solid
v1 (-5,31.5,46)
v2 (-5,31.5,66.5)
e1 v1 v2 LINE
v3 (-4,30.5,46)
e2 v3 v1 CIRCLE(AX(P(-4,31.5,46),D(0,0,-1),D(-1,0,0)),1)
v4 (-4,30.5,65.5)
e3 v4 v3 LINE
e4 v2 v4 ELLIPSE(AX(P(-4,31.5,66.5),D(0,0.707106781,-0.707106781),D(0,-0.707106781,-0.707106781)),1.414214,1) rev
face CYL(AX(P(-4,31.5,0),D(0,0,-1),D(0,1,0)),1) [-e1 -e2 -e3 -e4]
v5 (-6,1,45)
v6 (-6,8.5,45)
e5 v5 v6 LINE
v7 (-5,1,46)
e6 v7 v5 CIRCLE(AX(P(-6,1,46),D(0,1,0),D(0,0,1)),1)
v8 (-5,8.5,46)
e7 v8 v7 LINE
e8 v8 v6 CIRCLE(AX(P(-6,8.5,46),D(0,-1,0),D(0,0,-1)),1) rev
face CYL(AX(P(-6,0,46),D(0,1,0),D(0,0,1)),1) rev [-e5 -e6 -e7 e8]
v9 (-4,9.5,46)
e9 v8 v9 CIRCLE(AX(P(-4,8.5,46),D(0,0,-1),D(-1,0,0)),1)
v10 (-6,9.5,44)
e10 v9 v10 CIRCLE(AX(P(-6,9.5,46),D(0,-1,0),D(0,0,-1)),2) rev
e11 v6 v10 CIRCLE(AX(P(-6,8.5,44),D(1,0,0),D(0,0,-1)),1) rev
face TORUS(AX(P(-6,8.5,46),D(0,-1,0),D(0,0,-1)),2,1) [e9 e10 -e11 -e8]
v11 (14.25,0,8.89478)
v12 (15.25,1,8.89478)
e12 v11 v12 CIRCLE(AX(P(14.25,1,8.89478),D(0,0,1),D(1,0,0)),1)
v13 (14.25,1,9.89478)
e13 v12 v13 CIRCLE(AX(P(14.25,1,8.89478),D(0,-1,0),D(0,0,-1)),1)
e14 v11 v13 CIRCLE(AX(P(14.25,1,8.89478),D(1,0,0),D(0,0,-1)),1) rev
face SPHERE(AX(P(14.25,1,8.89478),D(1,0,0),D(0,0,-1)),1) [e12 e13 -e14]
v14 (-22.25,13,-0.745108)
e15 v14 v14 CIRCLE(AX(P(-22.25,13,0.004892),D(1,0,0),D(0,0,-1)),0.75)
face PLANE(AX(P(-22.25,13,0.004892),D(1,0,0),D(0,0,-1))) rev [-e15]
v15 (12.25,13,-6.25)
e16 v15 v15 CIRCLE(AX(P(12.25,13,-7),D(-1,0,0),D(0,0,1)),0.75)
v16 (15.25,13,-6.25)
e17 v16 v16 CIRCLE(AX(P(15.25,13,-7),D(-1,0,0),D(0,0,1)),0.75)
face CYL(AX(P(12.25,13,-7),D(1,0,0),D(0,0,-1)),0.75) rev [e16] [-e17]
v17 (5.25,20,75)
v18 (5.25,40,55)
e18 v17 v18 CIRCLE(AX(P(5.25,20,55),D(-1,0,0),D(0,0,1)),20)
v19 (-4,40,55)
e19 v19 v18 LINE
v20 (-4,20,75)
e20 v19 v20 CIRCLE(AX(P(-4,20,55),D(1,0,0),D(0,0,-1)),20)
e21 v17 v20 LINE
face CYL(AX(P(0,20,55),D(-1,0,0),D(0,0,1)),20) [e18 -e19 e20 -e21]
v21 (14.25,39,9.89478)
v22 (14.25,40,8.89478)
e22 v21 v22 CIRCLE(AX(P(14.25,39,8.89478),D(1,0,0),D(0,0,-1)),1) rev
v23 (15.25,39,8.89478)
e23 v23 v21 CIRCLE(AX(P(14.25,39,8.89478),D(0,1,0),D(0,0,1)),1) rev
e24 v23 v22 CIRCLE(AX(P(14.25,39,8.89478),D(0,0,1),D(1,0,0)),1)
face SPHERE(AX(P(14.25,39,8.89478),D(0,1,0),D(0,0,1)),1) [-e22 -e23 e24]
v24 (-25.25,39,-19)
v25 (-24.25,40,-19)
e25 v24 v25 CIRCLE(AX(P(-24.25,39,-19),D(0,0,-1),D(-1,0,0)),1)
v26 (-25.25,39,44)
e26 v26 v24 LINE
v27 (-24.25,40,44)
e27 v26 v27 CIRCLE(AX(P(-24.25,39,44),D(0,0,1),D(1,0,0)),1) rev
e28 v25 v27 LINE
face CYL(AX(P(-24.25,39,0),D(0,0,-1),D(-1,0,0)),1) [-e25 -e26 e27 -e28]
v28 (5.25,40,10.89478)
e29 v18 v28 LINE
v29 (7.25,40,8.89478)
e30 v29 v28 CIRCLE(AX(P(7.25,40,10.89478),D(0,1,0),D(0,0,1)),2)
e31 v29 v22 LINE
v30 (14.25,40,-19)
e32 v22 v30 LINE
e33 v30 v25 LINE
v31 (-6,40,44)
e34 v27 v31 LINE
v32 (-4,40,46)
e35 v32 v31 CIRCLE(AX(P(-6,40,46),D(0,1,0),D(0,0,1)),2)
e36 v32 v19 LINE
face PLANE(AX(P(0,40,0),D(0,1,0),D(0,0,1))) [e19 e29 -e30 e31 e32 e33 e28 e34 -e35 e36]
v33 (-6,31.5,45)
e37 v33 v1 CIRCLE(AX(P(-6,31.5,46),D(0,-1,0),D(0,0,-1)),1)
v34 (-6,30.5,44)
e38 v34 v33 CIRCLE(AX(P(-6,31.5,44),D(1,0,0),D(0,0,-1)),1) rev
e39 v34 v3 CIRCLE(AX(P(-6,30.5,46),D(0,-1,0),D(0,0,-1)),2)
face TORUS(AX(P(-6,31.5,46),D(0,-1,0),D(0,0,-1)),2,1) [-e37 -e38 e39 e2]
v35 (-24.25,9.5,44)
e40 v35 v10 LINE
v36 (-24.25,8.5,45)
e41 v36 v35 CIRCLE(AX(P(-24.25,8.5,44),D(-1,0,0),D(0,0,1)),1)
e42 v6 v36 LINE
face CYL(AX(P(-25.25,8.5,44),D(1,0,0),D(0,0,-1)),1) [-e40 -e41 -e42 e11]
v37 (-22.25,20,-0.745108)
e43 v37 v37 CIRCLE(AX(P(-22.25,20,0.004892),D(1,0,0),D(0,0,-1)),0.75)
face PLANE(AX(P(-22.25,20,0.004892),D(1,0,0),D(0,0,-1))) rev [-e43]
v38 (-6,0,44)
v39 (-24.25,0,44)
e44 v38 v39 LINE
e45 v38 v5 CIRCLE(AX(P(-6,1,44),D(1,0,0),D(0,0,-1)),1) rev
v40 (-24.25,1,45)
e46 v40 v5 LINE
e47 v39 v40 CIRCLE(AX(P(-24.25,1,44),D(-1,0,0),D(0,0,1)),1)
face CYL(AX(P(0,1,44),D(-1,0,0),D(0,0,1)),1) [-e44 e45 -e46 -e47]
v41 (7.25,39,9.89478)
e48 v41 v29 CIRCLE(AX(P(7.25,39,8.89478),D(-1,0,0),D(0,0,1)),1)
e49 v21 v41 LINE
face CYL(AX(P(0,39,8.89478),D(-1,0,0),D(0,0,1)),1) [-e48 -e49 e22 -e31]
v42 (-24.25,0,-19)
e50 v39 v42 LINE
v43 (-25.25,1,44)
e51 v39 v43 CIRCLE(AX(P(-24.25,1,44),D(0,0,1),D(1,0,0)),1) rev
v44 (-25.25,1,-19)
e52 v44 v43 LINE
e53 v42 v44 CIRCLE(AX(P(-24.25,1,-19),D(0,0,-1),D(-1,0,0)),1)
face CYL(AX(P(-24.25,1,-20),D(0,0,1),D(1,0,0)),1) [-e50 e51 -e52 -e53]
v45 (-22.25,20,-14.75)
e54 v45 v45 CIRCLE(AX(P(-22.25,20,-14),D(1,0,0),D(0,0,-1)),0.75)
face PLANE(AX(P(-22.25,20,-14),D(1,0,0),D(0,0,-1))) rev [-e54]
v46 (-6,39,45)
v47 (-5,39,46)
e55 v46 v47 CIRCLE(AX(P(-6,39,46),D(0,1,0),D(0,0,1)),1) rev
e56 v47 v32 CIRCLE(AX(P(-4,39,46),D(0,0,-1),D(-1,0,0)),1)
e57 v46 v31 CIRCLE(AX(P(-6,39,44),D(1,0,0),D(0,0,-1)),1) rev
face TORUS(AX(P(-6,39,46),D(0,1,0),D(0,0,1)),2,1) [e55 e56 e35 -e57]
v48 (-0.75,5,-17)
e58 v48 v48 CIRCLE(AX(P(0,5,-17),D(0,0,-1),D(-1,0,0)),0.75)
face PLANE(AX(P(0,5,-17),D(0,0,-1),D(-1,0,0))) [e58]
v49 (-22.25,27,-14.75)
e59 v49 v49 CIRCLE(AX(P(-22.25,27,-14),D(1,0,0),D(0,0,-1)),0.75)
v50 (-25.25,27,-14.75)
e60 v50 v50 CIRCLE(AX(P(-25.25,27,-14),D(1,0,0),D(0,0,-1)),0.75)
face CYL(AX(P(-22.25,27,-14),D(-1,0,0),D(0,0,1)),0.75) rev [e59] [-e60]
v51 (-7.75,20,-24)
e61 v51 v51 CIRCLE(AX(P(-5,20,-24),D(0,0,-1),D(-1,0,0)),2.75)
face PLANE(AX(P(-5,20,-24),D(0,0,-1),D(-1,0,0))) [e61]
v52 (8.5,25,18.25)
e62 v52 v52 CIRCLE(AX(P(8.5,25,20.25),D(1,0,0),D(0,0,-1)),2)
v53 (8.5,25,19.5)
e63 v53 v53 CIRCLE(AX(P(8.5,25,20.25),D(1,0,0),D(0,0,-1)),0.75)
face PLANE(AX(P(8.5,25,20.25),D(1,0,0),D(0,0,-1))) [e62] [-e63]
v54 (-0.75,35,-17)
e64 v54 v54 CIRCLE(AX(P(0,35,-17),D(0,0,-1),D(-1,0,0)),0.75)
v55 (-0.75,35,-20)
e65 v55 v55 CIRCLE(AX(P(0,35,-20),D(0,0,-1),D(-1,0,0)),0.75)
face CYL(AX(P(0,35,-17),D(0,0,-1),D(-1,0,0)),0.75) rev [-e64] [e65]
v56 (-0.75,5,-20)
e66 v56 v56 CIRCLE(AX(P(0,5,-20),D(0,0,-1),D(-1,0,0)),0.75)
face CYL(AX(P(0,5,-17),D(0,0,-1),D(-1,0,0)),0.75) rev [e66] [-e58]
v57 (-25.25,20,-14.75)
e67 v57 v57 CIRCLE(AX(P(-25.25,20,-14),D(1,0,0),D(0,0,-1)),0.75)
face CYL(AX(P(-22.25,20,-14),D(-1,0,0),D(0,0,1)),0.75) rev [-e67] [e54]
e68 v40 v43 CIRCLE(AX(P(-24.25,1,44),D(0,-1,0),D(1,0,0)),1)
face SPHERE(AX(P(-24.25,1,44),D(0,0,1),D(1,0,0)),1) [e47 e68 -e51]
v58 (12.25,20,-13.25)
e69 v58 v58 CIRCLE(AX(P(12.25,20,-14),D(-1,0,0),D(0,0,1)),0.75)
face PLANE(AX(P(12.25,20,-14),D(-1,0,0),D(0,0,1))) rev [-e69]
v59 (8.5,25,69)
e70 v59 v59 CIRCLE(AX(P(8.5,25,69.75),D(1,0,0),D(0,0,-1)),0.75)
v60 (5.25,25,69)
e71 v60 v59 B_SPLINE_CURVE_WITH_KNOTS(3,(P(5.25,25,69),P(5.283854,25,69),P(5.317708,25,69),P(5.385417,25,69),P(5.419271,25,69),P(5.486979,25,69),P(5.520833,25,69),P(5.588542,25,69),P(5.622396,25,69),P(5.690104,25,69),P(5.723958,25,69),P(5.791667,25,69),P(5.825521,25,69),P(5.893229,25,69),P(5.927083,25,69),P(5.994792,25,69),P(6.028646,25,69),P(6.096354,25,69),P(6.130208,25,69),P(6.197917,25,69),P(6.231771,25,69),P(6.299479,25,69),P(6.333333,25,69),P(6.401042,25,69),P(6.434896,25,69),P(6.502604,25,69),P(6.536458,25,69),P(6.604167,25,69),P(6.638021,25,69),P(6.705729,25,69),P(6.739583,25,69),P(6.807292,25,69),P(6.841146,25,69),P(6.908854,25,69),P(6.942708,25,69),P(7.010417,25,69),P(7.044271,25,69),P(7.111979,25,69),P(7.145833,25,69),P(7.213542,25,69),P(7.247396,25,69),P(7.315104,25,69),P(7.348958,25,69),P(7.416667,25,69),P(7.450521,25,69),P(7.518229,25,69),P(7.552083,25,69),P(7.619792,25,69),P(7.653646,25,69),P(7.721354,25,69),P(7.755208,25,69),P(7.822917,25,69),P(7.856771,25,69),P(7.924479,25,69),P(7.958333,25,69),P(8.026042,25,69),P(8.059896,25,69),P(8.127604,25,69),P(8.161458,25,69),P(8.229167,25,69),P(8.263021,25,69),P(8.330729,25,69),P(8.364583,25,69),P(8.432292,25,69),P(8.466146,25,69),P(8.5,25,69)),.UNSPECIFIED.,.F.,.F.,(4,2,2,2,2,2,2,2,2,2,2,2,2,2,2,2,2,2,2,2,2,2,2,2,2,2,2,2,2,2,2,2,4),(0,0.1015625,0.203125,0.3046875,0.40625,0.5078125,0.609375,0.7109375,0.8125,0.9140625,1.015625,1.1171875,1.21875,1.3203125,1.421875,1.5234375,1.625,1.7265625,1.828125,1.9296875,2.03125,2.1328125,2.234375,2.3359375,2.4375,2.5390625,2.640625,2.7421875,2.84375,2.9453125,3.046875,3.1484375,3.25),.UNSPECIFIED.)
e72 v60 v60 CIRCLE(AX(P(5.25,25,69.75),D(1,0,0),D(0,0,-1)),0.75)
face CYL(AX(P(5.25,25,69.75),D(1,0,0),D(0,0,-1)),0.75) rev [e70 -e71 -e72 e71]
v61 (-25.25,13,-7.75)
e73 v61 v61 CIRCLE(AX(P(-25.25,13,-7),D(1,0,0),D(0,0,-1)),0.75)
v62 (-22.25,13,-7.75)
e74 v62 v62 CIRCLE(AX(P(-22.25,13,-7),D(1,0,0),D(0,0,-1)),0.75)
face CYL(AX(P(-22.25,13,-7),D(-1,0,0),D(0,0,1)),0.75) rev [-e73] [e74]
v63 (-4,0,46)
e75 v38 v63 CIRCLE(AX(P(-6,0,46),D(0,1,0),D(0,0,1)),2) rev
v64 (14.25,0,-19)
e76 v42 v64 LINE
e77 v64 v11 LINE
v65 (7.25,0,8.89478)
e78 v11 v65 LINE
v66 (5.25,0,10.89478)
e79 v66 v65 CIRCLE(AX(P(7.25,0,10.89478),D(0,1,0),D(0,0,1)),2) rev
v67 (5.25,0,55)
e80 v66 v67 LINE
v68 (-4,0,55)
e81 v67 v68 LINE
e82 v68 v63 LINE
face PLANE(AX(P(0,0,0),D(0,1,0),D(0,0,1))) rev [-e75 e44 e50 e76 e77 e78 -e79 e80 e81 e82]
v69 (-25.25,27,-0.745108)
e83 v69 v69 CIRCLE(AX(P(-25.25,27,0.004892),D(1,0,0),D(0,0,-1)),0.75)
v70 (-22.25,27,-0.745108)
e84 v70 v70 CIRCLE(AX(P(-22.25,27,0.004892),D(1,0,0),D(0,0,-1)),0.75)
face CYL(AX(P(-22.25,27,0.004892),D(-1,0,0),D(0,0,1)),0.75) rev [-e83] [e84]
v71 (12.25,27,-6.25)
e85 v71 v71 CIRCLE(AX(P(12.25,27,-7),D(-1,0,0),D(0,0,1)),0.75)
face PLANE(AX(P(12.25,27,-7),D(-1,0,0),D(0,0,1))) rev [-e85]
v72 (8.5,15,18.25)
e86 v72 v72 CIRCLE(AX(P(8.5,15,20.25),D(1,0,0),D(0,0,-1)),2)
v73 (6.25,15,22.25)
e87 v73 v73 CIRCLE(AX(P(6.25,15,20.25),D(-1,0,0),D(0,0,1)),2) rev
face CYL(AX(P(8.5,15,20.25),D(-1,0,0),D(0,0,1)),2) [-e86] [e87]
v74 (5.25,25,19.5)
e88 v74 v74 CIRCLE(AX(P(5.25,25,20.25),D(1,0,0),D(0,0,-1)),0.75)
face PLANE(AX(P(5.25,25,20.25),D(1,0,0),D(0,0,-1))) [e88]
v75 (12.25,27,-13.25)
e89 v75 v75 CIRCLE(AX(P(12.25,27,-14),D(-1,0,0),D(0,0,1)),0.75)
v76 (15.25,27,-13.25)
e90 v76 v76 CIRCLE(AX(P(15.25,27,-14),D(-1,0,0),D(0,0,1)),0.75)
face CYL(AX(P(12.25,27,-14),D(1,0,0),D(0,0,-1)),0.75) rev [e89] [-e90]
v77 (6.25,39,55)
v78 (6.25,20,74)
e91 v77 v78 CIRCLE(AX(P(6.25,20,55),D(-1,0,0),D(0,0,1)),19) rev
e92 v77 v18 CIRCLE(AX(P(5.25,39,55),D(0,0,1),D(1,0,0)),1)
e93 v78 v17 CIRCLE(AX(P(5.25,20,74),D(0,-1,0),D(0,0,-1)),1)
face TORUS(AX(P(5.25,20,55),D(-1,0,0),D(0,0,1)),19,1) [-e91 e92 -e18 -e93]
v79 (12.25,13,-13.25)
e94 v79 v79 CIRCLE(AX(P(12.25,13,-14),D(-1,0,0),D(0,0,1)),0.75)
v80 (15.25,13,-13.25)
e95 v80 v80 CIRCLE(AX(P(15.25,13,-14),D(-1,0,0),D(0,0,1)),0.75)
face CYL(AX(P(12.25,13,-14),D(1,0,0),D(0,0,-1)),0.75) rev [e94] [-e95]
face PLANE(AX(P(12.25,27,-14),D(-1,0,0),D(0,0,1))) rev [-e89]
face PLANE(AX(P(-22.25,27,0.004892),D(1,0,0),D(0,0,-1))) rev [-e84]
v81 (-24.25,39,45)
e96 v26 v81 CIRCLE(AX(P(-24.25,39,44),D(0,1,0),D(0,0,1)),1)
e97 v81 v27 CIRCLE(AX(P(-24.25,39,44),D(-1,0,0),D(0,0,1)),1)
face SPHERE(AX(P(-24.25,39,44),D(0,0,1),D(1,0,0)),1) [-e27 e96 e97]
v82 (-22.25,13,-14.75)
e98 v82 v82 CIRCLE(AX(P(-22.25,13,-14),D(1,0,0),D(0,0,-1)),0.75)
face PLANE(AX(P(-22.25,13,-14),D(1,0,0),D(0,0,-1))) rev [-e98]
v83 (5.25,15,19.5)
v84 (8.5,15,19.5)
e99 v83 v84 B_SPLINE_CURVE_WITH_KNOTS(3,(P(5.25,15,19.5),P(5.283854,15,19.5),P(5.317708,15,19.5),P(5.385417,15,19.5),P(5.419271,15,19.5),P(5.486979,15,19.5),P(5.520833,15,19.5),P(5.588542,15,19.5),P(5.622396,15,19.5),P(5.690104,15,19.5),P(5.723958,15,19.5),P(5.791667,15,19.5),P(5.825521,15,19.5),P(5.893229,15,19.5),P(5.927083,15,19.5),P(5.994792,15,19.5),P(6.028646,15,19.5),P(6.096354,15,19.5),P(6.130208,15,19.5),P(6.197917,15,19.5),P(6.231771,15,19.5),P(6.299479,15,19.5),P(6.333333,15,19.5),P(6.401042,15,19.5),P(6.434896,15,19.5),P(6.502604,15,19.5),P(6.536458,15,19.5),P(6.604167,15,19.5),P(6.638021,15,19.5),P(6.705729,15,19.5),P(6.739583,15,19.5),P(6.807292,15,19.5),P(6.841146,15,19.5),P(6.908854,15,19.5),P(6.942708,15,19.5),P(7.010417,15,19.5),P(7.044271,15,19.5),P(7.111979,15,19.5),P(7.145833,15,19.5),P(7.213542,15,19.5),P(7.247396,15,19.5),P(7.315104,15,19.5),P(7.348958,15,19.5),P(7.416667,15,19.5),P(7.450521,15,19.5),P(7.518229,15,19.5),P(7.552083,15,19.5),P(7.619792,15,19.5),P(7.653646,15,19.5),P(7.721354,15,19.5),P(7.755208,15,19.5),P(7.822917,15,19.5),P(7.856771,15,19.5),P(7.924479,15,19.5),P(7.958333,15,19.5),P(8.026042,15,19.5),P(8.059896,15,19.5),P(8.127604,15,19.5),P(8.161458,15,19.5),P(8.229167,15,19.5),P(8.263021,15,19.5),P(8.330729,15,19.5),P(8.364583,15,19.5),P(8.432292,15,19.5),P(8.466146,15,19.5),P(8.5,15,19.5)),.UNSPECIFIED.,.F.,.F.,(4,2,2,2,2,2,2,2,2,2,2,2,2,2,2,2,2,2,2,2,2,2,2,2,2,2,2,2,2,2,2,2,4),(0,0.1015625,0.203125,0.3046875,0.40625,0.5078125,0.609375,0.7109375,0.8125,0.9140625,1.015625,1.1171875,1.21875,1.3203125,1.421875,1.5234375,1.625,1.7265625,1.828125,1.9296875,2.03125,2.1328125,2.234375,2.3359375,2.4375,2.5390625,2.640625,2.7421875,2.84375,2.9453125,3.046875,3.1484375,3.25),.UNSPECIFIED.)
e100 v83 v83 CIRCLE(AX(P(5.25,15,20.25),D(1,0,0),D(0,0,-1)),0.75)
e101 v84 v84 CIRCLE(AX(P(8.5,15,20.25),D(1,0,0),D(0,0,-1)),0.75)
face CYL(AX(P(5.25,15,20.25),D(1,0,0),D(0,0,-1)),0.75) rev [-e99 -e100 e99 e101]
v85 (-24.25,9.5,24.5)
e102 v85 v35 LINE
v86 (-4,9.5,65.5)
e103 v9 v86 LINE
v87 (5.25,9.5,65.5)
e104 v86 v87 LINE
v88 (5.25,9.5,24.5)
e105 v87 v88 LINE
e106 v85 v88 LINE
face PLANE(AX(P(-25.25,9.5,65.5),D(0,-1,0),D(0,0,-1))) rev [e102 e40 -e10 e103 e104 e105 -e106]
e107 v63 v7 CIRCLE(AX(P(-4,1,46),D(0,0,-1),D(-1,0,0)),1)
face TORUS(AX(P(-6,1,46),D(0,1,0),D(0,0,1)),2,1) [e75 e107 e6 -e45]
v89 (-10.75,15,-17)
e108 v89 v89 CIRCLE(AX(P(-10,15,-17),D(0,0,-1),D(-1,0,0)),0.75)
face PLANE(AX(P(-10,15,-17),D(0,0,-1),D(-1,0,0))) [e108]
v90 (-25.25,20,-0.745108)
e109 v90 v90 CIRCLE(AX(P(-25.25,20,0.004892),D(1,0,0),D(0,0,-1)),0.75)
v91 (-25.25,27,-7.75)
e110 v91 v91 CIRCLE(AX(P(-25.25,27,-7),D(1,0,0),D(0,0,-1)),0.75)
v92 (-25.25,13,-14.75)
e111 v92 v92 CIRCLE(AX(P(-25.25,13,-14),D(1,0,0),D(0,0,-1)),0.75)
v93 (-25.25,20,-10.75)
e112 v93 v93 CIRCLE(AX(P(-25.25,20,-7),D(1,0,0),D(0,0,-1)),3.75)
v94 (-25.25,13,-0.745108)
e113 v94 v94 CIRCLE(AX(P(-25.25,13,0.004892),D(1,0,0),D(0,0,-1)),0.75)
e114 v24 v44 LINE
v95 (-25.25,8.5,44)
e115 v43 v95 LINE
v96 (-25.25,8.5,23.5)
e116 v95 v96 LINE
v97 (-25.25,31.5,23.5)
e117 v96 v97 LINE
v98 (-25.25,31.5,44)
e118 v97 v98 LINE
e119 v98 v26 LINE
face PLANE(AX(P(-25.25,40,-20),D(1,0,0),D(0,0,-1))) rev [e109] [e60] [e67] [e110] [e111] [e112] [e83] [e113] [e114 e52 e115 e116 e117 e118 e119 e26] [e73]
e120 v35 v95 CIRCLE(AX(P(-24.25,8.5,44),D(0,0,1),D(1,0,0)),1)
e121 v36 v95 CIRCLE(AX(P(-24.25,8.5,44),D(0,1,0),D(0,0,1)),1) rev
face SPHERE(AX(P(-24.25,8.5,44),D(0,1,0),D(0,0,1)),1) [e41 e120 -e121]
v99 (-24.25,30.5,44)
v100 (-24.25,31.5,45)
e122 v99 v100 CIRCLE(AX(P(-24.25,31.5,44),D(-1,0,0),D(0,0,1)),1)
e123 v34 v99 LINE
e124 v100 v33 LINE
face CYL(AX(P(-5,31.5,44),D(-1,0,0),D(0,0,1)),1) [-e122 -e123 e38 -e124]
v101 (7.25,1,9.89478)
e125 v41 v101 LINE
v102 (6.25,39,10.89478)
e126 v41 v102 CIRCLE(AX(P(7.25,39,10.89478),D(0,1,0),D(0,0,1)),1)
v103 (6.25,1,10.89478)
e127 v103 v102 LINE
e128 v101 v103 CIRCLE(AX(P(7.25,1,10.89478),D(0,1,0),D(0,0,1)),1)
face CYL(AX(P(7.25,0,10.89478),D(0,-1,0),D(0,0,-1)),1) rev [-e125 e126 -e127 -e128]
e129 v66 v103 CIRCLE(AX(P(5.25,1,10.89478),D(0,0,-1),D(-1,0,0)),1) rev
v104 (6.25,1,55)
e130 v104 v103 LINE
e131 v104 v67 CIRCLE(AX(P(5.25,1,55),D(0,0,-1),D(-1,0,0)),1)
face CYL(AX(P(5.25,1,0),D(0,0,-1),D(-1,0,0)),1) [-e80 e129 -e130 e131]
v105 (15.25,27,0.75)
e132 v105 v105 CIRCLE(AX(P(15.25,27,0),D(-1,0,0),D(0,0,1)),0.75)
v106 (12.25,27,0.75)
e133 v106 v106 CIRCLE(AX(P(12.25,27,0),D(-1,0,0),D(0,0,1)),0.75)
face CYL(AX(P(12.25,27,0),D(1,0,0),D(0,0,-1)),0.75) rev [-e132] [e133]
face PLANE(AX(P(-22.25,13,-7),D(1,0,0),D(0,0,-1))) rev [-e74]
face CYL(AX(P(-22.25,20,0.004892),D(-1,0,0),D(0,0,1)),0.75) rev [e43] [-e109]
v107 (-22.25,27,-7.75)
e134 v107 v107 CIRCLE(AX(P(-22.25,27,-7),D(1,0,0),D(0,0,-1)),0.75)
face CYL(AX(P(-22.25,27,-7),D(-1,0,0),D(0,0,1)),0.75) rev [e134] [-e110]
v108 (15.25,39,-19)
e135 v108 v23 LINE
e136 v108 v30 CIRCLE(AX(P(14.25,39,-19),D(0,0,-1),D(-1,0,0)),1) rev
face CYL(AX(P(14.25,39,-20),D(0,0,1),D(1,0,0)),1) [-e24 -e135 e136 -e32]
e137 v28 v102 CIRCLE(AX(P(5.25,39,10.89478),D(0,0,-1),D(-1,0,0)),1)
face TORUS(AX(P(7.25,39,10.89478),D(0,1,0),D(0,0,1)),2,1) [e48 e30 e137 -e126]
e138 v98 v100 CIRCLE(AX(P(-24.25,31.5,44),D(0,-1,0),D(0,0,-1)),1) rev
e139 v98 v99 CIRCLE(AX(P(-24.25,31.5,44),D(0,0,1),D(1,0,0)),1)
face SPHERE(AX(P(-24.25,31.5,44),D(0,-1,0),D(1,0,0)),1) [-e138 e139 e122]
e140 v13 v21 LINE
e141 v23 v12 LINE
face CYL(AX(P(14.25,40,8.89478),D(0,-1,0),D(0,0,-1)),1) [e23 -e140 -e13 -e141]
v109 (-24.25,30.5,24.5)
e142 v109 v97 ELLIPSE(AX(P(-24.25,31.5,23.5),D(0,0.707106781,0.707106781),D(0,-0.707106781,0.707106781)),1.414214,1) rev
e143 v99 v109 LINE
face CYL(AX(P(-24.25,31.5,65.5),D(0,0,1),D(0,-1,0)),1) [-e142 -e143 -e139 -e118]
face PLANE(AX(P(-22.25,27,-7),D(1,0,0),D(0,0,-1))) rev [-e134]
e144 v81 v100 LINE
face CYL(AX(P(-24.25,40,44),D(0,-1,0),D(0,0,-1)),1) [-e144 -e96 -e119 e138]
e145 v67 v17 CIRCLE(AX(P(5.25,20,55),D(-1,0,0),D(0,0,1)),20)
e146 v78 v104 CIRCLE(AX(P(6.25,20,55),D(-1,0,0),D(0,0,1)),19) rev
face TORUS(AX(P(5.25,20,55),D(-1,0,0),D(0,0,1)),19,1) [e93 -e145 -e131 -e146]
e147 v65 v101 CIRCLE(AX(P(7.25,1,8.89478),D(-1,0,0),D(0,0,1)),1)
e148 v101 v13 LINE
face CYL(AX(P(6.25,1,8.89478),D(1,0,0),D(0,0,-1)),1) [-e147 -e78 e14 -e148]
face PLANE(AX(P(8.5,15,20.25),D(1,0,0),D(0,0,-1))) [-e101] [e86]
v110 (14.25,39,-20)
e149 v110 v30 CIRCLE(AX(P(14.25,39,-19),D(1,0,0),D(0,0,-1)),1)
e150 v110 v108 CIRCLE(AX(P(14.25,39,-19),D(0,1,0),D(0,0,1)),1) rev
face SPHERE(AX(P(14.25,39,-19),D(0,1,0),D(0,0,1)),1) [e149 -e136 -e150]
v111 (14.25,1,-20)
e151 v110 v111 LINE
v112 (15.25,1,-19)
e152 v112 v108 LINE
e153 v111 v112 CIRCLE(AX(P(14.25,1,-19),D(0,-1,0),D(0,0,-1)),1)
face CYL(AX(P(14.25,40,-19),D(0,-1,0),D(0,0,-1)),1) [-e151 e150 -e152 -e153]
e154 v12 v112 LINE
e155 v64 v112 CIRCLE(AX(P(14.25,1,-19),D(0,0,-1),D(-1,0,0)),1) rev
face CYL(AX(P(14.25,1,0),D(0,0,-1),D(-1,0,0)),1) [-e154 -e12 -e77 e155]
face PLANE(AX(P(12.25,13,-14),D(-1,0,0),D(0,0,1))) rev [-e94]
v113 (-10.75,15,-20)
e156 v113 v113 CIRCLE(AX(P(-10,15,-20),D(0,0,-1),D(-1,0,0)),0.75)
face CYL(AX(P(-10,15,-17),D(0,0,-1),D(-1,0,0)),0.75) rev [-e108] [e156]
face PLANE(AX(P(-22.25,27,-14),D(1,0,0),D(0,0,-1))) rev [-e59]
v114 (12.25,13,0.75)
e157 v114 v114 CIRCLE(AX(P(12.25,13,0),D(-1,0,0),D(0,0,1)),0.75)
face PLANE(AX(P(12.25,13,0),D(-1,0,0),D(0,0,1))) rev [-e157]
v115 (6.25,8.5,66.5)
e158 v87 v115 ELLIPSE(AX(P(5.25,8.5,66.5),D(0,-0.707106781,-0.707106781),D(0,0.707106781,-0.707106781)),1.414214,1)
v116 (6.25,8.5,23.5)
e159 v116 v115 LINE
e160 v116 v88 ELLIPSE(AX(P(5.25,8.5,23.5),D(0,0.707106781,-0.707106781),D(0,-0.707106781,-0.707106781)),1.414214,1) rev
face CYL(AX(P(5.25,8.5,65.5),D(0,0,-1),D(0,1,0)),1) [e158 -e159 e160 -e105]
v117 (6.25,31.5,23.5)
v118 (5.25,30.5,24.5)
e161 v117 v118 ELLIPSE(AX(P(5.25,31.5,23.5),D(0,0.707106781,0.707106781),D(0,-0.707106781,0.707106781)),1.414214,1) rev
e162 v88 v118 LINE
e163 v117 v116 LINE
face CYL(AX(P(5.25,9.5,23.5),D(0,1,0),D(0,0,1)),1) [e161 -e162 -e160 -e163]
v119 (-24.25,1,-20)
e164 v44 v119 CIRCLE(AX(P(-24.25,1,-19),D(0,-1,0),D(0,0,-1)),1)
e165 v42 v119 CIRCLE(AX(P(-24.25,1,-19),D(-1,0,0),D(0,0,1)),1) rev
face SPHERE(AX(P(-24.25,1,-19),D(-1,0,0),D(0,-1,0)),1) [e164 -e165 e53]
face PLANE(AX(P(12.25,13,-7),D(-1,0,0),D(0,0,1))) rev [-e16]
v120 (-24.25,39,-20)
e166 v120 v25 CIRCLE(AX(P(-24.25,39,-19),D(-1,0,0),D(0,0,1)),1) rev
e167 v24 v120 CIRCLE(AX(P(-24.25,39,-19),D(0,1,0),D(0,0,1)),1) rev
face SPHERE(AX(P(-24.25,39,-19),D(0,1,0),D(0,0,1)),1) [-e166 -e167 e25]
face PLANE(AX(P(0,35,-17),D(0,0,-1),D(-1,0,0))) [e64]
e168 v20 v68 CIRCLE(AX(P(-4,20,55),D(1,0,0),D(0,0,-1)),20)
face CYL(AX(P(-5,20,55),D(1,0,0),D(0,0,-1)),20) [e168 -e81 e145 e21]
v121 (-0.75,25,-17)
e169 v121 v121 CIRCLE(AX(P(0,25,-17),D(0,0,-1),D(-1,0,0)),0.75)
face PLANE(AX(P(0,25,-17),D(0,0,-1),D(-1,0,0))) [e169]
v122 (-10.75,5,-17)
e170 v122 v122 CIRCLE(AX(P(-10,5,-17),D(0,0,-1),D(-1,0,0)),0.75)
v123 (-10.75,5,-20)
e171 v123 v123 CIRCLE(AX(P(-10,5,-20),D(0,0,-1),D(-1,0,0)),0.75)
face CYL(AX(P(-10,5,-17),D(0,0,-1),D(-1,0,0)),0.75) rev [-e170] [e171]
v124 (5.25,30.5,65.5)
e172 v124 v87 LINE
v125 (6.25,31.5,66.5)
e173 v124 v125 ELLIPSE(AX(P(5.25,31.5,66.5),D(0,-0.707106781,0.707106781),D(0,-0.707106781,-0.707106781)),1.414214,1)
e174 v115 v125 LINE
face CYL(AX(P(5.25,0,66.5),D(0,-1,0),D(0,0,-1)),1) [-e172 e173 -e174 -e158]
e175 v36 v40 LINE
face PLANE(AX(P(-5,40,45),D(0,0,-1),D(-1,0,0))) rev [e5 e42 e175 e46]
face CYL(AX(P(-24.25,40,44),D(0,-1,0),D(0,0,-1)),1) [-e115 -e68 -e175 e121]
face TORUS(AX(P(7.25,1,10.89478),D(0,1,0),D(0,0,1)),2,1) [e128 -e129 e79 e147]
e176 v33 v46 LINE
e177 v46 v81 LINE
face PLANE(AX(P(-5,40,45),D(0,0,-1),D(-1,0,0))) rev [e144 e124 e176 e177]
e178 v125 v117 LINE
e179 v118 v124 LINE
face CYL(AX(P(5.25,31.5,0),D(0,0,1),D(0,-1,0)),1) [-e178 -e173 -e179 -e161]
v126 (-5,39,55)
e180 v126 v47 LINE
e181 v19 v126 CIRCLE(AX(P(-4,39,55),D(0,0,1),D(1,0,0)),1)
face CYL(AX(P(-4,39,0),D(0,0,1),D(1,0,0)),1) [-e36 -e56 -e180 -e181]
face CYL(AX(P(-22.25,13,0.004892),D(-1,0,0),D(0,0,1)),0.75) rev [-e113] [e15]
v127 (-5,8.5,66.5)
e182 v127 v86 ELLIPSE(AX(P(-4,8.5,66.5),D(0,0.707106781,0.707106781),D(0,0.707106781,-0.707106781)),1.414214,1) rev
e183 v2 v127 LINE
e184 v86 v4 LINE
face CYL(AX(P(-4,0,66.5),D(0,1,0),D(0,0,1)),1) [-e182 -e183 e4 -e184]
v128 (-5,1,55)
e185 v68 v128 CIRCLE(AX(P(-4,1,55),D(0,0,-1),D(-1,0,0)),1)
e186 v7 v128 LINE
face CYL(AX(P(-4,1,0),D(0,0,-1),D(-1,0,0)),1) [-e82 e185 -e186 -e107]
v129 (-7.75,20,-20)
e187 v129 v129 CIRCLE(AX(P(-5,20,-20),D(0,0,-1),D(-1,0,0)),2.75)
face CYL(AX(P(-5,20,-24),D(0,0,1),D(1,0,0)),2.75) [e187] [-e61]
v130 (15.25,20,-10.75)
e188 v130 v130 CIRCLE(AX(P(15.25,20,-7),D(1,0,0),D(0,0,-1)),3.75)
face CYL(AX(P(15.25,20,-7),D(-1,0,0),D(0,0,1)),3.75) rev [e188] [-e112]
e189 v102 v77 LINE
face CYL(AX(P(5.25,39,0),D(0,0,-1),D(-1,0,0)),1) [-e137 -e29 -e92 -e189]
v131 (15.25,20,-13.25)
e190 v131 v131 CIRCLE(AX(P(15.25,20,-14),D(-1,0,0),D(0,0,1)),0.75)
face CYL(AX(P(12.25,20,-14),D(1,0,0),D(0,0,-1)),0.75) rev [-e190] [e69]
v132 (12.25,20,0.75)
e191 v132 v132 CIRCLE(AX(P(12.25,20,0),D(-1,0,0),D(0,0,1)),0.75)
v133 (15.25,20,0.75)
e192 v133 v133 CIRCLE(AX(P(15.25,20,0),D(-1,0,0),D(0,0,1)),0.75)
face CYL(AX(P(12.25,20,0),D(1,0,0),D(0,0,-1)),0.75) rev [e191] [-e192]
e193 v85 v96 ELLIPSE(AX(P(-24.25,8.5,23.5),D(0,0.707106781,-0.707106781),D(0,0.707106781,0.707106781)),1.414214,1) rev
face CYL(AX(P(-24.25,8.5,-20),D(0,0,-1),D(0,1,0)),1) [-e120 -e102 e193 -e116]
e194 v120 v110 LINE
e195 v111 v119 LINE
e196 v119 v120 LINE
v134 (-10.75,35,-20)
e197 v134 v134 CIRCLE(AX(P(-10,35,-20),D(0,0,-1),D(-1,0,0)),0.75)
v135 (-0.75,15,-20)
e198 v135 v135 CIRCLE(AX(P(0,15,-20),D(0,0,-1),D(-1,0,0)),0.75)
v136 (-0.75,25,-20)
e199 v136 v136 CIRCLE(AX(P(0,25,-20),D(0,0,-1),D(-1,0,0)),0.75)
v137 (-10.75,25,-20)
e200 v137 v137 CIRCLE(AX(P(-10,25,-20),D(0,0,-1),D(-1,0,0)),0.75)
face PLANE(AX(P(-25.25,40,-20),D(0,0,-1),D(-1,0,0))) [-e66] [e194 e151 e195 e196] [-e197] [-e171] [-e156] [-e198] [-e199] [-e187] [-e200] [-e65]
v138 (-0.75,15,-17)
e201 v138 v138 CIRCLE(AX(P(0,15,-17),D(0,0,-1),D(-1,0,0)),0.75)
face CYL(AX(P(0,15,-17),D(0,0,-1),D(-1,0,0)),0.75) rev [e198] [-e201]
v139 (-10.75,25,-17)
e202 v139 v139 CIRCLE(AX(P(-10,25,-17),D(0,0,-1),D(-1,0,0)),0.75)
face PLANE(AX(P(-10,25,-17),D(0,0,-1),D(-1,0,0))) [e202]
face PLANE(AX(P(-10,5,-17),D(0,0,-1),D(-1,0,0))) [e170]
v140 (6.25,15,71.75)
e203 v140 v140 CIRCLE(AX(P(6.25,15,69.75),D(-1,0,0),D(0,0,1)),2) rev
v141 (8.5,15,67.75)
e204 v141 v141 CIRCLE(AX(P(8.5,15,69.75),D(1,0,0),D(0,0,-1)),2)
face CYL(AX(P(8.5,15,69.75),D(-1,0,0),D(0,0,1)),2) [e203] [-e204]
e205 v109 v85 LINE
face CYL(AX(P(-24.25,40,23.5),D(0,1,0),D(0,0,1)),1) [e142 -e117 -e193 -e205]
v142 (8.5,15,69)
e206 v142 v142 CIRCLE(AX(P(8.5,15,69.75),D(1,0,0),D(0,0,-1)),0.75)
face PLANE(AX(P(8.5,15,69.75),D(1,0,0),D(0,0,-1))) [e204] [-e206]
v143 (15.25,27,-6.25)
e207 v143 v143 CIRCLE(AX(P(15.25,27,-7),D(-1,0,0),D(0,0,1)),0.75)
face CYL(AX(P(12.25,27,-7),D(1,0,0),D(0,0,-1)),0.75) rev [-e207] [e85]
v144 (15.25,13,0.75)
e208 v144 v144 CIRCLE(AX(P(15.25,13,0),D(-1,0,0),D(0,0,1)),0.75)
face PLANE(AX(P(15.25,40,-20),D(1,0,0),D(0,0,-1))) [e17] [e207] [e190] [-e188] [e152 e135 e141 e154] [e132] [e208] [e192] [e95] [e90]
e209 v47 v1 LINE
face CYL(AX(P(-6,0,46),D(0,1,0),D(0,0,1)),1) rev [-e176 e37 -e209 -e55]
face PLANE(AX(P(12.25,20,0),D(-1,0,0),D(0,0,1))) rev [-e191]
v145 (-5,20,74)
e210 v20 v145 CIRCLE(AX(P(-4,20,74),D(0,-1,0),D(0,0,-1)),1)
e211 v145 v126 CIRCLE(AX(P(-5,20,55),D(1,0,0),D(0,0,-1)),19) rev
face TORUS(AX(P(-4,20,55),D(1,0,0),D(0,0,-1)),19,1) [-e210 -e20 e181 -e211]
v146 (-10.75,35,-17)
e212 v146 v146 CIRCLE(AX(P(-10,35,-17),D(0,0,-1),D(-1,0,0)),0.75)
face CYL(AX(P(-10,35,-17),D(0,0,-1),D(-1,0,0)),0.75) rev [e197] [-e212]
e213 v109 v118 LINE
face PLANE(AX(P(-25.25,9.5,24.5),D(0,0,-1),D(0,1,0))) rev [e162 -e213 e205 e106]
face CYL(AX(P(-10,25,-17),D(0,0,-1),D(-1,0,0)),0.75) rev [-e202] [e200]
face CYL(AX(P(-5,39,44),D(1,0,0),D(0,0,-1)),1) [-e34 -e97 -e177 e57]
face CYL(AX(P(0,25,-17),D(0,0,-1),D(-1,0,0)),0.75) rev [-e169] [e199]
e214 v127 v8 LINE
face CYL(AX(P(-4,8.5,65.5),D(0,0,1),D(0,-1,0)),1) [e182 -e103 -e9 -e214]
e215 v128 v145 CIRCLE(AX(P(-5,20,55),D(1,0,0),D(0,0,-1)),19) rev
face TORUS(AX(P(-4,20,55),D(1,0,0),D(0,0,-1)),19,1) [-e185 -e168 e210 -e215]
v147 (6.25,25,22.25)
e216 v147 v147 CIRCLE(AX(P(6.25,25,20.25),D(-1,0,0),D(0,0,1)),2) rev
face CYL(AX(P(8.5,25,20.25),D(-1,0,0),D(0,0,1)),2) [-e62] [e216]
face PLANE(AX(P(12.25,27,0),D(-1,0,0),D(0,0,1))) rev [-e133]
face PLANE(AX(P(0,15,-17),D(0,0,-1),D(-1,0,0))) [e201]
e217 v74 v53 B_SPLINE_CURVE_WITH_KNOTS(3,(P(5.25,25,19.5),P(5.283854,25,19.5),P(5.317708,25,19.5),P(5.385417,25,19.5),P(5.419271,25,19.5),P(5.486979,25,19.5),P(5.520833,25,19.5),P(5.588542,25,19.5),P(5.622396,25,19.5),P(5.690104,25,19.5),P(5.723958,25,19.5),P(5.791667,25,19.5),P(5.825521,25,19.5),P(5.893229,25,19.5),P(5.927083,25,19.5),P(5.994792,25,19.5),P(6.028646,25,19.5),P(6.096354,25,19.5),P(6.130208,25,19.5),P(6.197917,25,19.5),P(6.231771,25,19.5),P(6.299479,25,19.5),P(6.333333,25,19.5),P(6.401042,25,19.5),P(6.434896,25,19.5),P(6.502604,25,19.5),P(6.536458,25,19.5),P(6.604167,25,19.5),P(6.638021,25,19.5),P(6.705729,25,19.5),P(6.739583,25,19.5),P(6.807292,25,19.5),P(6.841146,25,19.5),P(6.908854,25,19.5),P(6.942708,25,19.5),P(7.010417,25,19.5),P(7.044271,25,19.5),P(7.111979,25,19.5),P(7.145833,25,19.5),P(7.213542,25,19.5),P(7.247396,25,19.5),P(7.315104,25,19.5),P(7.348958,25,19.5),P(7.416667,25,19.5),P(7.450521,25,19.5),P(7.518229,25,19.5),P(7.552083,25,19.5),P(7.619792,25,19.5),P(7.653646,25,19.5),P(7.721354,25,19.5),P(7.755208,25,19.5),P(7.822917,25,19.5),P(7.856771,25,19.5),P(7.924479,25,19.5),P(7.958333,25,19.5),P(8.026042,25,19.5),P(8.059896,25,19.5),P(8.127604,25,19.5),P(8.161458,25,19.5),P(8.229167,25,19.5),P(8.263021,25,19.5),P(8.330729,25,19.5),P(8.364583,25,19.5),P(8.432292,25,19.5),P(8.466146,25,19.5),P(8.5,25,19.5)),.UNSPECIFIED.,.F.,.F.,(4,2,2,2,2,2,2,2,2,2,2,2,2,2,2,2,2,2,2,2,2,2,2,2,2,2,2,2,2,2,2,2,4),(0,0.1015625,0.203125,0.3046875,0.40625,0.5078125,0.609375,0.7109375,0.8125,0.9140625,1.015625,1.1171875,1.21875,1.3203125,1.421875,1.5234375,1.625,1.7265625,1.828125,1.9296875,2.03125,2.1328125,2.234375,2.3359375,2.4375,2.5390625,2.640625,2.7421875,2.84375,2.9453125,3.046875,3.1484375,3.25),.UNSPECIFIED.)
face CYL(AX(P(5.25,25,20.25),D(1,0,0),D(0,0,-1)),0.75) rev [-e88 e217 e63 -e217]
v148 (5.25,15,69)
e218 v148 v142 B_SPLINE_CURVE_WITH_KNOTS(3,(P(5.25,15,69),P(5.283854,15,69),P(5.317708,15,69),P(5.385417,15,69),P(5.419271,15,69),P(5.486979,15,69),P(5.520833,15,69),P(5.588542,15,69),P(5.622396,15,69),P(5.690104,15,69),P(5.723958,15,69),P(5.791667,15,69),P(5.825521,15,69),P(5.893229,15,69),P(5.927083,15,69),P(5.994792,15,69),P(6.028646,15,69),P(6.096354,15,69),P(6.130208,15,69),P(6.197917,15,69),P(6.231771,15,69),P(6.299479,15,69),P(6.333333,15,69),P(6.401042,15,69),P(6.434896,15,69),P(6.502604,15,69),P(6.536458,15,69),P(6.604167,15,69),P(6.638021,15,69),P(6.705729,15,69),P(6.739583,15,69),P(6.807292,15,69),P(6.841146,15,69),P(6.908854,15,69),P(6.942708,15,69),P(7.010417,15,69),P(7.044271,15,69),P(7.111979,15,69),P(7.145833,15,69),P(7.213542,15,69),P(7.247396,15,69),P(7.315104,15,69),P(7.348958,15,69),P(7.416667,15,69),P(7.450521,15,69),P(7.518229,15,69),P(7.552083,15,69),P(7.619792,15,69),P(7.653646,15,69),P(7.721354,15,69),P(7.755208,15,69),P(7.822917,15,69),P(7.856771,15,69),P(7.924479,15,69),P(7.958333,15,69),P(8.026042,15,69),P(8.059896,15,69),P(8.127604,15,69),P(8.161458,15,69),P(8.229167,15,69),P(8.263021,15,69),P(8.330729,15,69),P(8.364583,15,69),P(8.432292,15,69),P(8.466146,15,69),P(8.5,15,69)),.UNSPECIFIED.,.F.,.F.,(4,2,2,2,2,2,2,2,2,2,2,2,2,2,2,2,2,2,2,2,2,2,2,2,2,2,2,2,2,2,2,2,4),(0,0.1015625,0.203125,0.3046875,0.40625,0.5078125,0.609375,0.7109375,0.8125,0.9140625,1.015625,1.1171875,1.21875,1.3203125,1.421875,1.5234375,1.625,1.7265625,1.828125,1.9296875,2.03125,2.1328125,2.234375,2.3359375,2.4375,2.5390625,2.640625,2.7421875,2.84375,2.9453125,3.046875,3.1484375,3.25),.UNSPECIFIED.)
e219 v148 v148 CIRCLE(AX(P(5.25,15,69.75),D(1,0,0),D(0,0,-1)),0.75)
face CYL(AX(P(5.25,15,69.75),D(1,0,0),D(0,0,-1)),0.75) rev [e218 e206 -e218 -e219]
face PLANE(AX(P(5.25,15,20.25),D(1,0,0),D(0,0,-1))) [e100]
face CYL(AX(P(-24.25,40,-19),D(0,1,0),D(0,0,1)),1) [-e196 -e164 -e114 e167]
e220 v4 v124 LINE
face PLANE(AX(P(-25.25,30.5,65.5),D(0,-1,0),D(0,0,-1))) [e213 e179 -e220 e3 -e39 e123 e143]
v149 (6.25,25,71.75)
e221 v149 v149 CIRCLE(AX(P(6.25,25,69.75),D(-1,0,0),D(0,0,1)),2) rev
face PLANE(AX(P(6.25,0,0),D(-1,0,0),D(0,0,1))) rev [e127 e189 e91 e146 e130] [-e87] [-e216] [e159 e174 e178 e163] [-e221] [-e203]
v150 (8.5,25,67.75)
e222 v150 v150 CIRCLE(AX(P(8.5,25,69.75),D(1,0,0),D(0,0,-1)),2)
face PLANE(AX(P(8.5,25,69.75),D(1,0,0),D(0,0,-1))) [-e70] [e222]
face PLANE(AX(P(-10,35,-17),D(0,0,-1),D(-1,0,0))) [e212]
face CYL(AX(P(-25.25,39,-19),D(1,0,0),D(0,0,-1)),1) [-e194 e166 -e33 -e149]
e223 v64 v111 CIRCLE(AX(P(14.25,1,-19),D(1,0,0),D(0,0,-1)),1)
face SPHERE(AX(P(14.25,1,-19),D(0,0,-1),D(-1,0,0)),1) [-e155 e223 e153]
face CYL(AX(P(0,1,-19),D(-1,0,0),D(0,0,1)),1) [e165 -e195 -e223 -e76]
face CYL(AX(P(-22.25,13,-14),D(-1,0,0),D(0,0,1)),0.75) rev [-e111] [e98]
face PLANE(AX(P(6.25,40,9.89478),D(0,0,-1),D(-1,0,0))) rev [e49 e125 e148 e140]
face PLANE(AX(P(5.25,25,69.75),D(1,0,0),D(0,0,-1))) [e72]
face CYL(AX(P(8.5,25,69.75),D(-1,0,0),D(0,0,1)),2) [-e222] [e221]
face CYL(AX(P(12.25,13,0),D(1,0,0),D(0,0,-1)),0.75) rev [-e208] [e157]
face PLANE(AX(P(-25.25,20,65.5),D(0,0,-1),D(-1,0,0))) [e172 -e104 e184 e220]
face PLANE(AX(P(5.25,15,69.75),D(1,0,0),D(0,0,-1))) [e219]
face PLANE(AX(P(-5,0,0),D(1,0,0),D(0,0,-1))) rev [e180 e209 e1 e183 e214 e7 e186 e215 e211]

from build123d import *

# Parameters (mm, degrees)
MBODY_DEPTH             = 40
SKETCH5_R               = 0.75
FRONTSCREWS_DEPTH       = 3
SKETCH7_R               = 2.75
GUIDKNOB_DEPTH          = 4
SERVOCUT_DEPTH          = 40.5
ROUNDEDGE_R             = 20
SKETCH23_W              = 70
SKETCH23_H              = 40
TOPPUSHDOWN_DEPTH       = 9
SKETCH12_R              = 2
SERVOHOLDERS_DEPTH      = 2.25
SKETCH24_R              = 0.75
SERVOHOLDERSCREWS_DEPTH = 3.25
SKETCH14_W              = 30
SKETCH14_H              = 40
CABLEACCESS_DEPTH       = 20.25
ROUNDEDGES_R            = 1
SKETCH8_R               = 0.75
SIDESCREWS1_DEPTH       = 3
SIDESCREWS2_START       = 3
SKETCH17_R              = 0.75
SIDESCREWS2_DEPTH       = 3
SKETCH18_R              = 3.75
SIDEGUIDEHOLE_DEPTH     = 40.5


with BuildPart() as part:
    # Sketch4 → MBODY (new body)
    with BuildSketch(Plane(origin=(0, 0, 0), x_dir=(1, 0, 0), z_dir=(0, 1, 0))):
        Polygon((-5, 20), (-25.25, 20), (-25.25, -75), (-5, -75), (15.25, -75), (15.25, 20), align=None)
    extrude(amount=MBODY_DEPTH)

    # Sketch5 → FrontScrews (cut)
    with BuildSketch(Plane(origin=(0, 0, -20), x_dir=(-1, 0, 0), z_dir=(0, 0, -1))):
        with Locations((0, 5)):
            Circle(SKETCH5_R)
        with Locations((10, 5)):
            Circle(SKETCH5_R)
        with Locations((10, 15)):
            Circle(SKETCH5_R)
        with Locations((0, 15)):
            Circle(SKETCH5_R)
        with Locations((0, 25)):
            Circle(SKETCH5_R)
        with Locations((10, 25)):
            Circle(SKETCH5_R)
        with Locations((10, 35)):
            Circle(SKETCH5_R)
        with Locations((0, 35)):
            Circle(SKETCH5_R)
    extrude(amount=-FRONTSCREWS_DEPTH, mode=Mode.SUBTRACT)

    # Sketch7 → GUIDKNOB (add)
    with BuildSketch(Plane(origin=(0, 0, -20), x_dir=(-1, 0, 0), z_dir=(0, 0, -1))):
        with Locations((5, 20)):
            Circle(SKETCH7_R)
    extrude(amount=GUIDKNOB_DEPTH)

    # Sketch10 → ServoCut (cut)
    with BuildSketch(Plane(origin=(15.25, 0, 0), x_dir=(0, 0, -1), z_dir=(1, 0, 0))):
        Polygon((-65.5, 20), (-65.5, 30.5), (-24.5, 30.5), (-24.5, 9.5), (-65.5, 9.5), align=None)
    extrude(amount=-SERVOCUT_DEPTH, mode=Mode.SUBTRACT)

    # RoundEdge
    roundedge_edges = [part.edges().sort_by_distance(p)[0] for p in [
        (-5, 0, 75),
        (-5, 40, 75),
    ]]
    fillet(roundedge_edges, radius=ROUNDEDGE_R - 0.0001)  # a hair under: the kernel refuses the full size

    # Sketch23 → TOPPUSHDOWN (cut)
    with BuildSketch(Plane(origin=(15.25, 0, 0), x_dir=(0, 0, -1), z_dir=(1, 0, 0))):
        with Locations((-44.894780196, 20)):
            Rectangle(SKETCH23_W, SKETCH23_H)
    extrude(amount=-TOPPUSHDOWN_DEPTH, mode=Mode.SUBTRACT)

    # Sketch12 → SERVOHOLDERS (add)
    with BuildSketch(Plane(origin=(6.25, 0, 0), x_dir=(0, 0, -1), z_dir=(1, 0, 0))):
        with Locations(Location((-69.75, 25, 0), (0, 0, 180))):
            Circle(SKETCH12_R)
        with Locations(Location((-69.75, 15, 0), (0, 0, 180))):
            Circle(SKETCH12_R)
        with Locations(Location((-20.25, 15, 0), (0, 0, 180))):
            Circle(SKETCH12_R)
        with Locations(Location((-20.25, 25, 0), (0, 0, 180))):
            Circle(SKETCH12_R)
    extrude(amount=SERVOHOLDERS_DEPTH)

    # Sketch24 → SERVOHOLDERSCREWS (cut)
    with BuildSketch(Plane(origin=(8.5, 0, 0), x_dir=(0, 0, -1), z_dir=(1, 0, 0))):
        with Locations((-69.75, 25)):
            Circle(SKETCH24_R)
        with Locations((-69.75, 15)):
            Circle(SKETCH24_R)
        with Locations((-20.25, 25)):
            Circle(SKETCH24_R)
        with Locations((-20.25, 15)):
            Circle(SKETCH24_R)
    extrude(amount=-SERVOHOLDERSCREWS_DEPTH, mode=Mode.SUBTRACT)

    # Sketch14 → CABLEACCESS (cut)
    with BuildSketch(Plane.ZY.offset(25.25)):
        with Locations((60, 20)):
            Rectangle(SKETCH14_W, SKETCH14_H)
    extrude(amount=-CABLEACCESS_DEPTH, mode=Mode.SUBTRACT)

    # ROUNDEDGES
    roundedges_edges = [part.edges().sort_by_distance(p)[0] for p in [
        (6.25, 9.5, 45),
        (6.25, 20, 24.5),
        (15.25, 20, 9.894780196),
        (-25.25, 20, -20),
        (15.25, 20, -20),
        (-5, 5.857835087, 69.142164913),
        (-25.25, 9.5, 34.75),
        (-15.125, 9.5, 45),
        (-25.25, 30.5, 34.75),
        (-15.125, 30.5, 45),
        (-5, 4.75, 45),
        (-15.125, 0, 45),
        (-5, 40, 50.00005),
        (-15.125, 40, 45),
        (-5, 30.5, 55.25),
        (-5, 20, 65.5),
        (-5, 34.142164913, 69.142164913),
        (-5, 35.25, 45),
        (-5, 0, 50.00005),
        (-5, 9.5, 55.25),
        (-25.25, 35.25, 45),
        (15.25, 40, -5.052609902),
        (-25.25, 4.75, 45),
        (-5, 40, -20),
        (-25.25, 40, 12.5),
        (-25.25, 20, 24.5),
        (-5, 0, -20),
        (15.25, 0, -5.052609902),
        (-25.25, 0, 12.5),
        (6.25, 5.857835087, 69.142164913),
        (6.25, 40, 32.447440098),
        (6.25, 0, 32.447440098),
        (10.75, 0, 9.894780196),
        (6.25, 20, 65.5),
        (6.25, 30.5, 45),
        (6.25, 34.142164913, 69.142164913),
        (6.25, 20, 9.894780196),
        (10.75, 40, 9.894780196),
    ]]
    fillet(roundedges_edges, radius=ROUNDEDGES_R)

    # Sketch8 → SideScrews1 (cut)
    with BuildSketch(Plane(origin=(15.25, 50, 0), x_dir=(0, 0, -1), z_dir=(-1, 0, 0))):
        with Locations(Location((14, 37, 0), (0, 0, 180))):
            Circle(SKETCH8_R)
        with Locations(Location((14, 30, 0), (0, 0, 180))):
            Circle(SKETCH8_R)
        with Locations(Location((7, 37, 0), (0, 0, 180))):
            Circle(SKETCH8_R)
        with Locations(Location((14, 23, 0), (0, 0, 180))):
            Circle(SKETCH8_R)
        with Locations(Location((0, 37, 0), (0, 0, 180))):
            Circle(SKETCH8_R)
        with Locations(Location((7, 23, 0), (0, 0, 180))):
            Circle(SKETCH8_R)
        with Locations(Location((0, 30, 0), (0, 0, 180))):
            Circle(SKETCH8_R)
        with Locations(Location((0, 23, 0), (0, 0, 180))):
            Circle(SKETCH8_R)
    extrude(amount=SIDESCREWS1_DEPTH, mode=Mode.SUBTRACT)

    # Sketch17 → SideScrews2 (cut)
    with BuildSketch(Plane(origin=(-25.25, 15, 0), x_dir=(0, -1, 0), z_dir=(1, 0, 0)).offset(SIDESCREWS2_START)):
        with Locations(Location((-12, 14, 0), (0, 0, 270))):
            Circle(SKETCH17_R)
        with Locations(Location((-5, 14, 0), (0, 0, 270))):
            Circle(SKETCH17_R)
        with Locations(Location((2, 14, 0), (0, 0, 270))):
            Circle(SKETCH17_R)
        with Locations(Location((2, 7, 0), (0, 0, 270))):
            Circle(SKETCH17_R)
        with Locations(Location((-12, 7, 0), (0, 0, 270))):
            Circle(SKETCH17_R)
        with Locations(Location((-12, -0.00489205, 0), (0, 0, 90))):
            Circle(SKETCH17_R)
        with Locations(Location((-5, -0.00489205, 0), (0, 0, 90))):
            Circle(SKETCH17_R)
        with Locations(Location((2, -0.00489205, 0), (0, 0, 90))):
            Circle(SKETCH17_R)
    extrude(amount=-SIDESCREWS2_DEPTH, mode=Mode.SUBTRACT)

    # Sketch18 → SIDEGUIDEHOLE (cut)
    with BuildSketch(Plane(origin=(-25.25, 25, 0), x_dir=(0, 1, 0), z_dir=(1, 0, 0))):
        with Locations(Location((-5, -7, 0), (0, 0, 270))):
            Circle(SKETCH18_R)
    extrude(amount=SIDEGUIDEHOLE_DEPTH, mode=Mode.SUBTRACT)


solid = part.part
